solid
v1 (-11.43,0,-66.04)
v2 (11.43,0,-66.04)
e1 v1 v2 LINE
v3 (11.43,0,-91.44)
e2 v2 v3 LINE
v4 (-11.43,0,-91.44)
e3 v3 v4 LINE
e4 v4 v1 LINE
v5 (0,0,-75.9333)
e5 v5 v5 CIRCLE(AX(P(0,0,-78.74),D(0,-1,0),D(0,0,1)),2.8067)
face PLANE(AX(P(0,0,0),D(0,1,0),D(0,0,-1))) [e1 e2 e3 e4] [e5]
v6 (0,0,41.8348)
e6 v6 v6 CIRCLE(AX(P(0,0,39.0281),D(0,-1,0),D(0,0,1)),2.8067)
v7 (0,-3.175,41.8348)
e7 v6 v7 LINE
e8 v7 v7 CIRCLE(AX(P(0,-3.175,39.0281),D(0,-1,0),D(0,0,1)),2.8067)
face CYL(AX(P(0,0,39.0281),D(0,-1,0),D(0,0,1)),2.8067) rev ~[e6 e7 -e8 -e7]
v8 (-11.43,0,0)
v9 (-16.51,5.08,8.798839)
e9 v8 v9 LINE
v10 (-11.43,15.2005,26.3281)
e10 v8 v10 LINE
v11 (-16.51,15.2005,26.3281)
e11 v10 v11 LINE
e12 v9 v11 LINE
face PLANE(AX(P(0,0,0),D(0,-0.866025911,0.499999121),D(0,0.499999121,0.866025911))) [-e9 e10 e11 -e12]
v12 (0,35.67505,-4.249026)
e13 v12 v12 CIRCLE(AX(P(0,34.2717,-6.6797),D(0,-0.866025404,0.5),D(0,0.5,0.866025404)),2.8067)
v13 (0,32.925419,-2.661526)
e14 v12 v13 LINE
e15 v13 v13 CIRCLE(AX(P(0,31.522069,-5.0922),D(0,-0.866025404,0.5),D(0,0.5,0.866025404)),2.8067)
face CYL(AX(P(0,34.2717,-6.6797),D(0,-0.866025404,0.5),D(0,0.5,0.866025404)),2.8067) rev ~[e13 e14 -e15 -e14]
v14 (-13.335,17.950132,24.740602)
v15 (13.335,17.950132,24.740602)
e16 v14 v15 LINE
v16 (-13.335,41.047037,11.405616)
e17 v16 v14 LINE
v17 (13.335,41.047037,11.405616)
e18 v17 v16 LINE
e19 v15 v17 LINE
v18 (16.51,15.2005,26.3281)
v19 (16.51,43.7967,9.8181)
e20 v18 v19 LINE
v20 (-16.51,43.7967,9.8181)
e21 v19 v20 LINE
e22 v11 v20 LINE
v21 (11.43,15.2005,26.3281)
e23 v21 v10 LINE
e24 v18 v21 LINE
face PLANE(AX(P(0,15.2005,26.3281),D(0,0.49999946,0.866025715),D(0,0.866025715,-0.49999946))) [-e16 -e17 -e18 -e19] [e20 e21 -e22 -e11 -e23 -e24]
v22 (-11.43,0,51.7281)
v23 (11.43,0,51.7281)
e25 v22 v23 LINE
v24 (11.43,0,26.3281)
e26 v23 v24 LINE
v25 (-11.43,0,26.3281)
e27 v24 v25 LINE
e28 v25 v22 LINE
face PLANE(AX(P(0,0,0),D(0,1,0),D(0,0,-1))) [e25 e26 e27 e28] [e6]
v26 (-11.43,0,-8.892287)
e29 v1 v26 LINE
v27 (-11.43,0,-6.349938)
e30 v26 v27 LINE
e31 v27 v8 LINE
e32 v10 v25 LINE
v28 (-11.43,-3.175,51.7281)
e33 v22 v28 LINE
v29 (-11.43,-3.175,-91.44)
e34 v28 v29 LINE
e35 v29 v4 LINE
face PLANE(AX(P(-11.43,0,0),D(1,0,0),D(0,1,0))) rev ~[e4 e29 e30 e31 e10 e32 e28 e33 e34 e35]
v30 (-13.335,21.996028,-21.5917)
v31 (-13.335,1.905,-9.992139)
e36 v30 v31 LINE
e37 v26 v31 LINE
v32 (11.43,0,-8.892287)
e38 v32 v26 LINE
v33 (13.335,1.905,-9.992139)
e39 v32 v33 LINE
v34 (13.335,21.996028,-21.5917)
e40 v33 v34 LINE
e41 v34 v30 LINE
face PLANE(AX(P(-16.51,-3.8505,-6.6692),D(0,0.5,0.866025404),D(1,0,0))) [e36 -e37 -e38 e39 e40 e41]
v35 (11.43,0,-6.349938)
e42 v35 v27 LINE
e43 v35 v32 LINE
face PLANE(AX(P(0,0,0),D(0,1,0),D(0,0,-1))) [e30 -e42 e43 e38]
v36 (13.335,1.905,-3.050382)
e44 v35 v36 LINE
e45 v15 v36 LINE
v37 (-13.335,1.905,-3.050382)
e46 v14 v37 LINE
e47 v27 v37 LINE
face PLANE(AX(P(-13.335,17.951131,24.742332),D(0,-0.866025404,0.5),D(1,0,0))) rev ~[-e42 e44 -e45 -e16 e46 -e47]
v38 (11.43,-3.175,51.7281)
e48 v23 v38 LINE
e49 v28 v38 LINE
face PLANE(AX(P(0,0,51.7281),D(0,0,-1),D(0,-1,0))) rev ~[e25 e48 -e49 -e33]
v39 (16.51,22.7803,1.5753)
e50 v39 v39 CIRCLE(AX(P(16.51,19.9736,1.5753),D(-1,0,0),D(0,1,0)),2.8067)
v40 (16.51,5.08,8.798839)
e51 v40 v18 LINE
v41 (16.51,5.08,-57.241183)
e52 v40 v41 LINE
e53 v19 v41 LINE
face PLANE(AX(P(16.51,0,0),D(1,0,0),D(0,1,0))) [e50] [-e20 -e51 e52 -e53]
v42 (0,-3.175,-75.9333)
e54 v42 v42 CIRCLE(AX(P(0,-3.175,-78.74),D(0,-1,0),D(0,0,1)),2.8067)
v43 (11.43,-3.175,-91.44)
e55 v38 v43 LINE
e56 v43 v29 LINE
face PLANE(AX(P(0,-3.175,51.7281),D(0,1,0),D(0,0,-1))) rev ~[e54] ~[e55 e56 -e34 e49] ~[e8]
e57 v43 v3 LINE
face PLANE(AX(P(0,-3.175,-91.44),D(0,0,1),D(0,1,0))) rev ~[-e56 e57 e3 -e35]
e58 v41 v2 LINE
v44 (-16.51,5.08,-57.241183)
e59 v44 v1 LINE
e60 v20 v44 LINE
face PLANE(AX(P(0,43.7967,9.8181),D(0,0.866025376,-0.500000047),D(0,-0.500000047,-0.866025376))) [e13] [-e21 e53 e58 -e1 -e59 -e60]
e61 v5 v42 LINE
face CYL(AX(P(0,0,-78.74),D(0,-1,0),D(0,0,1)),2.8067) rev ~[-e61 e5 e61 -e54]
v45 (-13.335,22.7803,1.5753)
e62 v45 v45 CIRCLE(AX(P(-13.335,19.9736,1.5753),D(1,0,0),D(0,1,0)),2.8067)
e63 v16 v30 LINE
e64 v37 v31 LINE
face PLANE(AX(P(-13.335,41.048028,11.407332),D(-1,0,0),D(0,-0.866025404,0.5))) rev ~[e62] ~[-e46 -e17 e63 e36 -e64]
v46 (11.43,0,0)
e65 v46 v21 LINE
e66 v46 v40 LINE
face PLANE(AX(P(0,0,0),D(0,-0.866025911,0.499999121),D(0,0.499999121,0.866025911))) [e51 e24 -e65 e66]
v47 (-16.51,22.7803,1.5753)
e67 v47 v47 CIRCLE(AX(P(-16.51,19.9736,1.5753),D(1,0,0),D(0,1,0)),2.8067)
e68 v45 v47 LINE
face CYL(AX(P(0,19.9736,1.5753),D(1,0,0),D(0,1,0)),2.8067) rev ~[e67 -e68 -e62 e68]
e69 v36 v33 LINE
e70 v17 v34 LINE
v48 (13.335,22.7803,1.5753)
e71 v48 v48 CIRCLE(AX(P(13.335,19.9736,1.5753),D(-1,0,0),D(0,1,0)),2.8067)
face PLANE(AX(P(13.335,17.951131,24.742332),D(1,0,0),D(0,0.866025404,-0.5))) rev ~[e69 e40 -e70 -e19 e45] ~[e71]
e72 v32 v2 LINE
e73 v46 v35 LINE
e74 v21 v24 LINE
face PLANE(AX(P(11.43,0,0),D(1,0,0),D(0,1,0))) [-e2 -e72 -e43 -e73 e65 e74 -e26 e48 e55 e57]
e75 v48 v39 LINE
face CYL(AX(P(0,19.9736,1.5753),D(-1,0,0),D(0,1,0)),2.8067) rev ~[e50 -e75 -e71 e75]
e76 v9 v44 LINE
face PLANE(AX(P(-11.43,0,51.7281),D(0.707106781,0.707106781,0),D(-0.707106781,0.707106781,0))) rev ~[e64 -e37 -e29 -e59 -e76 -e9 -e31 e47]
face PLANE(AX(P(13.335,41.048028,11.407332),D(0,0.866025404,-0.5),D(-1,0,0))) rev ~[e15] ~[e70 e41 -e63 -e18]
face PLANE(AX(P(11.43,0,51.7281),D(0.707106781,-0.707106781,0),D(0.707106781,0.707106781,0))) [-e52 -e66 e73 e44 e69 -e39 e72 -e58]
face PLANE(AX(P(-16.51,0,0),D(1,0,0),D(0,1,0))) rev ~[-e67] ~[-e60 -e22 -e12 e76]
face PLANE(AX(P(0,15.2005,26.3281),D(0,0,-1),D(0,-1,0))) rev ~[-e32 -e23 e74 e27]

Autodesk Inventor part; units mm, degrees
ref_plane "YZ Plane" through (0, 0, 0) normal (1, 0, 0) x (0, 1, 0)
ref_plane "XZ Plane" through (0, 0, 0) normal (0, 1, 0) x (-1, 0, 0)
ref_plane "XY Plane" through (0, 0, 0) normal (0, 0, 1) x (1, 0, 0)
sketch "Sketch1" plane through (0, 0, 0) normal (1, 0, 0) x (0, 1, 0)
  line L0 (0, 0) -> (15.2005, 26.3281)
  line L1 (15.2005, 26.3281) -> (43.7967, 9.8181)
  line L2 (0, -98.8011) -> (0, 41.6267) projected
  line L3 (43.7967, 9.8181) -> (0, -66.04)
  line L4 (0, 0) -> (0, -66.04)
  line L5 (19.05, 24.1056) -> (0, -8.89) construction
  dimension "d0" = 33.02
  dimension "d1" = 30
  dimension "d5" = 4.445
  dimension "d6" = 38.1
extrude "Extrusion1" add sketch "Sketch1" along normal mid plane 33.02
sketch "Sketch2" plane through (-16.51, 15.2005, 26.3281) normal (0, 0.5, 0.8660254) x (1, 0, 0)
  line L0 (0, 0) -> (33.02, 0) construction
  line L1 (33.02, 0) -> (33.02, 33.02) construction
  line L2 (0, 0) -> (33.02, 33.02) construction
  line L3 (33.02, 33.02) -> (0, 33.02) construction
  line L4 (0, 33.02) -> (33.02, 0) construction
  line L5 (3.175, 3.175) -> (29.845, 3.175)
  line L6 (29.845, 3.175) -> (29.845, 29.845)
  line L7 (29.845, 29.845) -> (3.175, 29.845)
  line L8 (3.175, 29.845) -> (3.175, 3.175)
  line L9 (3.175, 3.175) -> (29.845, 29.845) construction
  line L10 (29.845, 3.175) -> (3.175, 29.845) construction
  point P0 (16.51, 0)
  point P1 (16.51, 16.51)
  dimension "d7" = 26.67
extrude "Extrusion2" cut sketch "Sketch2" against normal blind 38.1
sketch "Sketch3" plane through (0, 0, 0) normal (1, 0, 0) x (0, 1, 0)
  line L0 (15.2005, 26.3281) -> (0, 0) projected
  line L1 (0, 0) -> (0, -66.04) projected
  line L2 (0, -66.04) -> (43.7967, 9.8181) projected
  line L3 (21.997, -21.59) -> (0, -8.89) projected
  line L4 (17.9501, 24.7406) -> (0, -6.35) projected
  line L5 (0, 0) -> (0, -66.04)
  line L6 (15.2005, 26.3281) -> (1.6498, 26.3281) construction
  line L7 (0, 0) -> (15.2005, 26.3281) projected
  line L8 (0, 0) -> (0, 51.7281)
  line L9 (43.7967, 9.8181) -> (0, -66.04) projected
  line L10 (0, -66.04) -> (0, -91.44)
  line L11 (0, -134.3611) -> (0, 77.1867) projected
  line L12 (0, 51.7281) -> (-3.175, 51.7281)
  line L13 (-3.175, 51.7281) -> (-3.175, -91.44)
  line L14 (-3.175, -91.44) -> (0, -91.44)
  point P0 (1.0999, -13.335)
  point P1 (0, -15.24)
  point P2 (0, -6.35)
  dimension "d10" = 25.4
  dimension "d11" = 25.4
  dimension "d12" = 3.175
  dimension "supportBaseLength" = 143.1681
extrude "Extrusion3" add sketch "Sketch3" along normal mid plane 22.86
sketch "Sketch5" plane through (0, 0, 0) normal (1, 0, 0) x (0, 1, 0)
  line L0 (0, 0) -> (15.2005, 26.3281) projected
  line L1 (0, 51.7281) -> (0, 0) projected
  line L2 (15.2005, 26.3281) -> (43.7967, 9.8181) projected
  line L3 (15.2005, 26.3281) -> (0, 26.3281)
  line L4 (0, 0) -> (15.2005, 26.3281)
extrude "Extrusion5" add sketch "Sketch5" along normal mid plane 22.86
sketch "Sketch4" plane through (0, 0, 0) normal (0, 0, 1) x (1, 0, 0)
  line L0 (16.51, 43.7967) -> (-16.51, 43.7967) projected
  line L1 (16.51, 0) -> (16.51, 43.7967) projected
  line L2 (16.51, 0) -> (11.43, 0) projected
  line L3 (11.43, 0) -> (-11.43, 0) projected
  line L4 (-11.43, 0) -> (-16.51, 0) projected
  line L5 (-16.51, 43.7967) -> (-16.51, 0) projected
  line L6 (-11.43, 0) -> (-11.43, -3.175) projected
  line L7 (11.43, -3.175) -> (-11.43, -3.175) projected
  line L8 (11.43, -3.175) -> (11.43, 0) projected
  line L9 (-11.43, 0) -> (-16.51, 5.08)
  line L10 (-16.51, 43.7967) -> (-16.51, 0) projected
  line L11 (-16.51, 5.08) -> (-16.51, 0)
  line L12 (0, 0) -> (0, 43.7967) construction
  line L13 (11.43, 0) -> (16.51, 0)
  line L14 (11.43, 0) -> (16.51, 5.08)
  line L15 (16.51, 5.08) -> (16.51, 0)
  dimension "d15" = 45
extrude "Extrusion4" cut sketch "Sketch4" against normal up to surface (143.1681 mm away) from surface at 51.7281 contours L1 L2 L14 | L9 L4 L5
sketch "Sketch6" plane through (-11.43, 0, 51.7281) normal (0, 1, 0) x (1, 0, 0)
  line L0 (22.86, 143.1681) -> (0, 143.1681) construction
  line L1 (11.43, 143.1681) -> (11.43, 0) construction
  line L2 (22.86, 0) -> (0, 0) construction
  point P0 (11.43, 51.7281)
  point P1 (11.43, 130.4681)
  point P2 (11.43, 12.7)
  dimension "d21" = 12.7
  dimension "d22" = 12.7
hole "Hole1" at (0, 0, -78.74) at (0, 0, 39.0281) direction (0, -1, 0) diameter 5.6134 end through all clearance for "Flat Head Machine Screw (82)" size "#10" standard "Ansi Unified Screw Threads"
sketch "Sketch9" plane through (0, 0, 0) normal (1, 0, 0) x (0, 1, 0)
  line L0 (1.905, -3.0504) -> (1.905, -9.9899) projected
  line L1 (1.905, -9.9899) -> (21.997, -21.59) projected
  line L2 (41.047, 11.4056) -> (21.997, -21.59) projected
  line L3 (17.9501, 24.7406) -> (41.047, 11.4056) projected
  line L4 (17.9501, 24.7406) -> (1.905, -3.0504) projected
  line L5 (29.4986, 18.0731) -> (10.4486, -14.9225) construction
  line L6 (1.905, -9.9899) -> (21.997, -21.59) construction
  circle A0 centre (19.9736, 1.5753) radius 2.8067
  point P0 (0, 0)
  dimension "d30" = 5.6134
extrude "Extrusion6" cut sketch "Sketch9" along normal through all both and the other way through all contours A0
sketch "Sketch10" plane through (-16.51, 43.7967, 9.8181) normal (0, 0.8660254, -0.5) x (1, 0, 0)
  line L0 (3.175, 0) -> (29.845, 0) construction
  line L1 (16.51, 0) -> (16.51, 77.7875) construction
  point P0 (16.51, 30.401)
  point P1 (16.51, 19.05)
  dimension "d33" = 19.05
hole "Hole2" at (0, 34.2717, -6.6797) direction (0, -0.8660254, 0.5) diameter 5.6134 depth 3.175 clearance for "Flat Head Machine Screw (82)" size "#10" standard "Ansi Unified Screw Threads"
equation "\"d0\" = widthToSupportExtrusion"
equation "\"d1\" = attachementAngle"
equation "\"d6\" = insertDepth"
equation "\"d2\" = widthToSupportExtrusion"
equation "\"d7\" = insertForExtrusion"
equation "\"d8\" = insertDepth"
equation "\"d12\" = supportBaseDepth"
equation "\"d13\" = supportBaseWidth"
equation "\"attachementAngle\" = 30deg"
equation "\"extrusionSize\" = 25.4"
equation "\"wallThickness\" = 3.175"
equation "\"slipClearance\" = 0.635"
equation "\"insertForExtrusion\" = extrusionSize + 2 * slipClearance"
equation "\"widthToSupportExtrusion\" = insertForExtrusion + 2 * wallThickness"
equation "\"insertDepth\" = 38.1"
equation "\"supportBaseWidth\" = 22.86"
equation "\"supportBaseDepth\" = 3.175"
properties part number "30DegreeAttachementV04"
